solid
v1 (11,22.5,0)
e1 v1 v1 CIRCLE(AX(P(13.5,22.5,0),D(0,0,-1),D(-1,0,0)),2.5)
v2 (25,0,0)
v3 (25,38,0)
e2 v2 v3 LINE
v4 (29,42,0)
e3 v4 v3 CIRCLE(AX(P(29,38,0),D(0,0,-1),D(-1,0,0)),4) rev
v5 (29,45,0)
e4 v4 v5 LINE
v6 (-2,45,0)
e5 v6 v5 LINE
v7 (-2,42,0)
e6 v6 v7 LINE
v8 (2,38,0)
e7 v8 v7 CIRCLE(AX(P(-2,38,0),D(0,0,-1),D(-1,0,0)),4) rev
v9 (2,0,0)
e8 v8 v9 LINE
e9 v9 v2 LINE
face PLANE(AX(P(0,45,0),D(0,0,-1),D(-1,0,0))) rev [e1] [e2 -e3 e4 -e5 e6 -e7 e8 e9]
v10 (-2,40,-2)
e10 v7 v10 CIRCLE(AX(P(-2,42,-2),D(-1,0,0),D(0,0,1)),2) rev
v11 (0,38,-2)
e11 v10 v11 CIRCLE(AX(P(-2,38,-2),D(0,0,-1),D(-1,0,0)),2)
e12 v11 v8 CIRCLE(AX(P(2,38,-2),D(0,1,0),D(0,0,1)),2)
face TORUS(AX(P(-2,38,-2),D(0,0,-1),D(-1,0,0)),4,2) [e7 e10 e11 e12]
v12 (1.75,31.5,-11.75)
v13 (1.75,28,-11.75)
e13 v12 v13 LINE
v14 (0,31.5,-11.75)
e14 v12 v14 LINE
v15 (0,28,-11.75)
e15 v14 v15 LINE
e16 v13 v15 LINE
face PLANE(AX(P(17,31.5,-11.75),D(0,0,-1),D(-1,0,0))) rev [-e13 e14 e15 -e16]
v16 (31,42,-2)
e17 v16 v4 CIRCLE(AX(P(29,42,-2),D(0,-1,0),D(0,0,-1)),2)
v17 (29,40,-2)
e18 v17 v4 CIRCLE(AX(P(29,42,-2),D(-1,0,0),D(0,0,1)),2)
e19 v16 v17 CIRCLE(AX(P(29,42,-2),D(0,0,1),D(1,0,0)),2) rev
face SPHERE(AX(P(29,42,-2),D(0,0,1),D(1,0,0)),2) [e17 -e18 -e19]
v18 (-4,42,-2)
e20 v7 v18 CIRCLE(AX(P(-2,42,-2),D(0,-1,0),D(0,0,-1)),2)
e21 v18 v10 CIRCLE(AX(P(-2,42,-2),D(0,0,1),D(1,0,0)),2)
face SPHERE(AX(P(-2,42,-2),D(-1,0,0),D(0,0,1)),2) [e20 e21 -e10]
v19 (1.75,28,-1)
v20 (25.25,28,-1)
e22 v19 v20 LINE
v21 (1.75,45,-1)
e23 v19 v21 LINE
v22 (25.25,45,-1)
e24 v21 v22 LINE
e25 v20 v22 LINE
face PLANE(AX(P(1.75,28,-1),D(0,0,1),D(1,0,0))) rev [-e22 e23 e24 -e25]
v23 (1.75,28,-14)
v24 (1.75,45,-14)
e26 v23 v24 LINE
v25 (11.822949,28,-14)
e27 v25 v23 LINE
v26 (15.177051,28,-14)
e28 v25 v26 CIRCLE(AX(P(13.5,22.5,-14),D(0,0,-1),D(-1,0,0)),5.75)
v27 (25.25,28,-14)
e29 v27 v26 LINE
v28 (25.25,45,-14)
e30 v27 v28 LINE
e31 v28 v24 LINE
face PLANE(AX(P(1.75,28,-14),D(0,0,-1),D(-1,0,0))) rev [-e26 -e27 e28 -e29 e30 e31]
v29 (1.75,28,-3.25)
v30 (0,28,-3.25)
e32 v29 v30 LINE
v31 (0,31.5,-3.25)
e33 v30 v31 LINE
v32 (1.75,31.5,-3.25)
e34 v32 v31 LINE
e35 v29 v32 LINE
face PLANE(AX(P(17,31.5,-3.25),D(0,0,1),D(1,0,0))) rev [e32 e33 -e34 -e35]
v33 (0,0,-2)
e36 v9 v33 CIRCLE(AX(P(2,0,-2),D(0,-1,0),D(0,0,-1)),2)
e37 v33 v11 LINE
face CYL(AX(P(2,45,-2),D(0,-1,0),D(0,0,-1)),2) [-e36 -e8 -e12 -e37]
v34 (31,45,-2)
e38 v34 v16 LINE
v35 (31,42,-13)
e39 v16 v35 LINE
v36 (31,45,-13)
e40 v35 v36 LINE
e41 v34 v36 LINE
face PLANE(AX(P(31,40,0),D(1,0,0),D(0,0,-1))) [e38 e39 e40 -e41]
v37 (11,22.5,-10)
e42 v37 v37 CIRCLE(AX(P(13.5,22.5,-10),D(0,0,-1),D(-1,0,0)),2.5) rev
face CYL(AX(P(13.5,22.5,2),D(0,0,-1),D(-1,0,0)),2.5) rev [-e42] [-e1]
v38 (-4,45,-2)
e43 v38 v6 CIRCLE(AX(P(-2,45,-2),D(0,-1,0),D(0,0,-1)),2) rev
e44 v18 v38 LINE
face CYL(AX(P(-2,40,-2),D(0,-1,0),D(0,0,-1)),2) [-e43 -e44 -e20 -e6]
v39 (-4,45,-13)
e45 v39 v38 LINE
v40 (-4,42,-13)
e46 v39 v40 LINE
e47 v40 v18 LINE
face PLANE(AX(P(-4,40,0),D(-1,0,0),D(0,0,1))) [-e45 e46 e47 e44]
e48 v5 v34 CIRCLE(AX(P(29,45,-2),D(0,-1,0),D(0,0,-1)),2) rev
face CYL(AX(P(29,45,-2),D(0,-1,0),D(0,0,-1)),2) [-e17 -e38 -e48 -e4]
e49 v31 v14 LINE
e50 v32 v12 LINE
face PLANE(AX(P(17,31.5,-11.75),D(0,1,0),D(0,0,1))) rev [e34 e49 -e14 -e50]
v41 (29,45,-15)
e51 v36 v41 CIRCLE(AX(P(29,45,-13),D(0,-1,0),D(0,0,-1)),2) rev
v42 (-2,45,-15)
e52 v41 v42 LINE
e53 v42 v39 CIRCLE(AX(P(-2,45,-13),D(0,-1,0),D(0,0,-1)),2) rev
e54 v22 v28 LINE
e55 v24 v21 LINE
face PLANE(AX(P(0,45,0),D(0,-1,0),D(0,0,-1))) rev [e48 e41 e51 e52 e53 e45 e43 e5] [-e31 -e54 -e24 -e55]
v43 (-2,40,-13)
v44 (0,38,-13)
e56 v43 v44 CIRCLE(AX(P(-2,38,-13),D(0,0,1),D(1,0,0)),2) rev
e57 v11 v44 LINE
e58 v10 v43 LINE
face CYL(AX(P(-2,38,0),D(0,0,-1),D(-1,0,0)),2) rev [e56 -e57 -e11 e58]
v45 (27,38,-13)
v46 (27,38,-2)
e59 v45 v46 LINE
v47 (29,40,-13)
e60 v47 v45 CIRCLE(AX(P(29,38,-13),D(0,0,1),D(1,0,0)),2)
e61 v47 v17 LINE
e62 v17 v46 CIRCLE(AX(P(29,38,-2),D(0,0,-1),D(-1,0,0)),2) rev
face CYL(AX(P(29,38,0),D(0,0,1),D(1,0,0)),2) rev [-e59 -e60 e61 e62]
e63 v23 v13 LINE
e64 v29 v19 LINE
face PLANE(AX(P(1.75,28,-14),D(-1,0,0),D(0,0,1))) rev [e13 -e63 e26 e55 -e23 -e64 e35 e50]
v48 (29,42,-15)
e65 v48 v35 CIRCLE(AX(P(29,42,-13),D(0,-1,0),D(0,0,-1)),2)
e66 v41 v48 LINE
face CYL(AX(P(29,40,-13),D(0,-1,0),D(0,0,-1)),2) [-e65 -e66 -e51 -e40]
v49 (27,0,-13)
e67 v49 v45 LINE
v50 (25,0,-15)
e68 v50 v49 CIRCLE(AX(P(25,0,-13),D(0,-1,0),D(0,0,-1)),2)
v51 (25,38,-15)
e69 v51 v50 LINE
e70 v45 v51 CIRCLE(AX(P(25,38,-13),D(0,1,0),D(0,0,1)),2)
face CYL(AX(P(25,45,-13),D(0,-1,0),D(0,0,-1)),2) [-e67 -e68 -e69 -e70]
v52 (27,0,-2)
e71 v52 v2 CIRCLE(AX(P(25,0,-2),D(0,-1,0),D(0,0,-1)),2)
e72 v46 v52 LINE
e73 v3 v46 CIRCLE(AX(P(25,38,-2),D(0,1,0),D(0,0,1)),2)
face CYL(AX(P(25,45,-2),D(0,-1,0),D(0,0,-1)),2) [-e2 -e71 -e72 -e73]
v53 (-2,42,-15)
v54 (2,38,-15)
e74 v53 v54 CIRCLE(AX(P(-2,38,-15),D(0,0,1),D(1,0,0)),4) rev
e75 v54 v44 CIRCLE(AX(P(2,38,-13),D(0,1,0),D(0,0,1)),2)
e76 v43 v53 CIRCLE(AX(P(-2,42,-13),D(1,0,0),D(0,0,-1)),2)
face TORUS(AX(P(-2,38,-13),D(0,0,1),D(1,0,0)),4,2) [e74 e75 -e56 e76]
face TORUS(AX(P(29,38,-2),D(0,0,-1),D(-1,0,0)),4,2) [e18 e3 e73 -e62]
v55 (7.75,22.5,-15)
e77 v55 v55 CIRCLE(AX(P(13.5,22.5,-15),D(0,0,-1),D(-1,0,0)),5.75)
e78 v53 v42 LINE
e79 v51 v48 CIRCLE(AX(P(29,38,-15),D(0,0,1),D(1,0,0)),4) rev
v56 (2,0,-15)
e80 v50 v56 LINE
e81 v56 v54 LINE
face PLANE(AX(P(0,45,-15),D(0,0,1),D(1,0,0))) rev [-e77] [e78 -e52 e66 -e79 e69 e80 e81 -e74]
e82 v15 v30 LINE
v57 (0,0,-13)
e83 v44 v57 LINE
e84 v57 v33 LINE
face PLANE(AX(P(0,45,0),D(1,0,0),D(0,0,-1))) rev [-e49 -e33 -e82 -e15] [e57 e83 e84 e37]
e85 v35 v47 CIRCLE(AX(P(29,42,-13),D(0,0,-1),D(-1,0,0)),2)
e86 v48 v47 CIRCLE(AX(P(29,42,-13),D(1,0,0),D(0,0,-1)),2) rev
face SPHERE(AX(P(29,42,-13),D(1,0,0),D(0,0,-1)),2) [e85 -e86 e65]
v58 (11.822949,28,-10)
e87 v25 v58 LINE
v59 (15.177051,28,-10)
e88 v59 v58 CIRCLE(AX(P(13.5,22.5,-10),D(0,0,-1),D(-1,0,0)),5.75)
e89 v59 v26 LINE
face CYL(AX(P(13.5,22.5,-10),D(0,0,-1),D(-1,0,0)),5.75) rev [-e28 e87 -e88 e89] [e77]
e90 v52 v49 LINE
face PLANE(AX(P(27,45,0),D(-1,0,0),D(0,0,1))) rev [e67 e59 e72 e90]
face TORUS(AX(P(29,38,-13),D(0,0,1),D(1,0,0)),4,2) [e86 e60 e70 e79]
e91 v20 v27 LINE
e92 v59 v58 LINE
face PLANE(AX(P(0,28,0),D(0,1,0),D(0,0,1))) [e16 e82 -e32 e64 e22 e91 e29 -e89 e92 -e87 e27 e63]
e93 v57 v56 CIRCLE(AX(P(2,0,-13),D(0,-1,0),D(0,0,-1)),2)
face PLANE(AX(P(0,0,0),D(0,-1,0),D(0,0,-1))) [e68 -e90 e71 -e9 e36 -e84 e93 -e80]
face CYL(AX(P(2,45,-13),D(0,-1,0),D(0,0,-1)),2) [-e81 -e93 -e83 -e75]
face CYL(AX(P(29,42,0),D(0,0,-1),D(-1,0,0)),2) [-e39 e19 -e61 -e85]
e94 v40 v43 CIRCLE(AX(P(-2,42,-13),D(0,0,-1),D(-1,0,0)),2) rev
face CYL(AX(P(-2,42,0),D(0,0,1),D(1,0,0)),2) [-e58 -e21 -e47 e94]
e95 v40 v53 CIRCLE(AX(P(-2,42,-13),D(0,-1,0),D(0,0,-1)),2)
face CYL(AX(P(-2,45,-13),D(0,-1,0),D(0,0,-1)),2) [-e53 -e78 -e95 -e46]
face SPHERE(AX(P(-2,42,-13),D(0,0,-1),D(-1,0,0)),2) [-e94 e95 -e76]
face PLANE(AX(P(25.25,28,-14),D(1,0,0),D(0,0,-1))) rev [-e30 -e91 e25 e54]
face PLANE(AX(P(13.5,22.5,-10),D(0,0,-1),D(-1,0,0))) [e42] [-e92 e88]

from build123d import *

# Parameters (mm, degrees)
SKETCH1_W           = 27
SKETCH1_H           = 15
BOSS_EXTRUDE1_DEPTH = 45
SKETCH2_W           = 35
SKETCH2_H           = 15
BOSS_EXTRUDE2_DEPTH = 5
SKETCH3_W           = 23.5
SKETCH3_H           = 13
CUT_EXTRUDE1_DEPTH  = 17
SKETCH4_W           = 8.5
SKETCH4_H           = 3.5
CUT_EXTRUDE2_DEPTH  = 17
SKETCH5_R           = 2.5
CUT_EXTRUDE3_DEPTH  = 17
FILLET1_R           = 2
SKETCH6_R           = 5.75
CUT_EXTRUDE4_DEPTH  = 5


with BuildPart() as part:
    # Sketch1 → Boss-Extrude1 (new body)
    with BuildSketch(Plane(origin=(0, 0, 0), x_dir=(1, 0, 0), z_dir=(0, 1, 0))):
        with Locations((13.5, 7.5)):
            Rectangle(SKETCH1_W, SKETCH1_H)
    extrude(amount=BOSS_EXTRUDE1_DEPTH)

    # Sketch2 → Boss-Extrude2 (add)
    with BuildSketch(Plane(origin=(0, 45, 0), x_dir=(1, 0, 0), z_dir=(0, 1, 0))):
        with Locations((13.5, 7.5)):
            Rectangle(SKETCH2_W, SKETCH2_H)
    extrude(amount=-BOSS_EXTRUDE2_DEPTH)

    # Sketch3 → Cut-Extrude1 (cut)
    with BuildSketch(Plane(origin=(0, 45, 0), x_dir=(1, 0, 0), z_dir=(0, 1, 0))):
        with Locations((13.5, 7.5)):
            Rectangle(SKETCH3_W, SKETCH3_H)
    extrude(amount=-CUT_EXTRUDE1_DEPTH, mode=Mode.SUBTRACT)

    # Sketch4 → Cut-Extrude2 (cut)
    with BuildSketch(Plane.ZY):
        with Locations((-7.5, 29.75)):
            Rectangle(SKETCH4_W, SKETCH4_H)
    extrude(amount=-CUT_EXTRUDE2_DEPTH, mode=Mode.SUBTRACT)

    # Sketch5 → Cut-Extrude3 (cut)
    with BuildSketch(Plane(origin=(0, 0, -15), x_dir=(-1, 0, 0), z_dir=(0, 0, -1))):
        with Locations((-13.5, 22.5)):
            Circle(SKETCH5_R)
    extrude(amount=-CUT_EXTRUDE3_DEPTH, mode=Mode.SUBTRACT)

    # Fillet1
    fillet1_edges = [part.edges().sort_by_distance(p)[0] for p in [
        (0, 40, -7.5),
        (27, 40, -7.5),
    ]]
    fillet(fillet1_edges, radius=FILLET1_R)
    fillet1_2_edges = [part.edges().sort_by_distance(p)[0] for p in [
        (-4, 42.5, -15),
        (-4, 42.5, 0),
        (-4, 40, -7.5),
        (31, 40, -7.5),
        (31, 42.5, 0),
        (31, 42.5, -15),
        (0, 19, -15),
        (0, 19, 0),
        (27, 19, 0),
        (27, 19, -15),
        (27.585786438, 39.414213562, -15),
        (27.585786438, 39.414213562, 0),
        (-0.585786438, 39.414213562, 0),
        (-0.585786438, 39.414213562, -15),
    ]]
    fillet(fillet1_2_edges, radius=FILLET1_R - 0.0001)  # a hair under: the kernel refuses the full size

    # Sketch6 → Cut-Extrude4 (cut)
    with BuildSketch(Plane(origin=(0, 0, -15), x_dir=(-1, 0, 0), z_dir=(0, 0, -1))):
        with Locations((-13.5, 22.5)):
            Circle(SKETCH6_R)
    extrude(amount=-CUT_EXTRUDE4_DEPTH, mode=Mode.SUBTRACT)


solid = part.part
